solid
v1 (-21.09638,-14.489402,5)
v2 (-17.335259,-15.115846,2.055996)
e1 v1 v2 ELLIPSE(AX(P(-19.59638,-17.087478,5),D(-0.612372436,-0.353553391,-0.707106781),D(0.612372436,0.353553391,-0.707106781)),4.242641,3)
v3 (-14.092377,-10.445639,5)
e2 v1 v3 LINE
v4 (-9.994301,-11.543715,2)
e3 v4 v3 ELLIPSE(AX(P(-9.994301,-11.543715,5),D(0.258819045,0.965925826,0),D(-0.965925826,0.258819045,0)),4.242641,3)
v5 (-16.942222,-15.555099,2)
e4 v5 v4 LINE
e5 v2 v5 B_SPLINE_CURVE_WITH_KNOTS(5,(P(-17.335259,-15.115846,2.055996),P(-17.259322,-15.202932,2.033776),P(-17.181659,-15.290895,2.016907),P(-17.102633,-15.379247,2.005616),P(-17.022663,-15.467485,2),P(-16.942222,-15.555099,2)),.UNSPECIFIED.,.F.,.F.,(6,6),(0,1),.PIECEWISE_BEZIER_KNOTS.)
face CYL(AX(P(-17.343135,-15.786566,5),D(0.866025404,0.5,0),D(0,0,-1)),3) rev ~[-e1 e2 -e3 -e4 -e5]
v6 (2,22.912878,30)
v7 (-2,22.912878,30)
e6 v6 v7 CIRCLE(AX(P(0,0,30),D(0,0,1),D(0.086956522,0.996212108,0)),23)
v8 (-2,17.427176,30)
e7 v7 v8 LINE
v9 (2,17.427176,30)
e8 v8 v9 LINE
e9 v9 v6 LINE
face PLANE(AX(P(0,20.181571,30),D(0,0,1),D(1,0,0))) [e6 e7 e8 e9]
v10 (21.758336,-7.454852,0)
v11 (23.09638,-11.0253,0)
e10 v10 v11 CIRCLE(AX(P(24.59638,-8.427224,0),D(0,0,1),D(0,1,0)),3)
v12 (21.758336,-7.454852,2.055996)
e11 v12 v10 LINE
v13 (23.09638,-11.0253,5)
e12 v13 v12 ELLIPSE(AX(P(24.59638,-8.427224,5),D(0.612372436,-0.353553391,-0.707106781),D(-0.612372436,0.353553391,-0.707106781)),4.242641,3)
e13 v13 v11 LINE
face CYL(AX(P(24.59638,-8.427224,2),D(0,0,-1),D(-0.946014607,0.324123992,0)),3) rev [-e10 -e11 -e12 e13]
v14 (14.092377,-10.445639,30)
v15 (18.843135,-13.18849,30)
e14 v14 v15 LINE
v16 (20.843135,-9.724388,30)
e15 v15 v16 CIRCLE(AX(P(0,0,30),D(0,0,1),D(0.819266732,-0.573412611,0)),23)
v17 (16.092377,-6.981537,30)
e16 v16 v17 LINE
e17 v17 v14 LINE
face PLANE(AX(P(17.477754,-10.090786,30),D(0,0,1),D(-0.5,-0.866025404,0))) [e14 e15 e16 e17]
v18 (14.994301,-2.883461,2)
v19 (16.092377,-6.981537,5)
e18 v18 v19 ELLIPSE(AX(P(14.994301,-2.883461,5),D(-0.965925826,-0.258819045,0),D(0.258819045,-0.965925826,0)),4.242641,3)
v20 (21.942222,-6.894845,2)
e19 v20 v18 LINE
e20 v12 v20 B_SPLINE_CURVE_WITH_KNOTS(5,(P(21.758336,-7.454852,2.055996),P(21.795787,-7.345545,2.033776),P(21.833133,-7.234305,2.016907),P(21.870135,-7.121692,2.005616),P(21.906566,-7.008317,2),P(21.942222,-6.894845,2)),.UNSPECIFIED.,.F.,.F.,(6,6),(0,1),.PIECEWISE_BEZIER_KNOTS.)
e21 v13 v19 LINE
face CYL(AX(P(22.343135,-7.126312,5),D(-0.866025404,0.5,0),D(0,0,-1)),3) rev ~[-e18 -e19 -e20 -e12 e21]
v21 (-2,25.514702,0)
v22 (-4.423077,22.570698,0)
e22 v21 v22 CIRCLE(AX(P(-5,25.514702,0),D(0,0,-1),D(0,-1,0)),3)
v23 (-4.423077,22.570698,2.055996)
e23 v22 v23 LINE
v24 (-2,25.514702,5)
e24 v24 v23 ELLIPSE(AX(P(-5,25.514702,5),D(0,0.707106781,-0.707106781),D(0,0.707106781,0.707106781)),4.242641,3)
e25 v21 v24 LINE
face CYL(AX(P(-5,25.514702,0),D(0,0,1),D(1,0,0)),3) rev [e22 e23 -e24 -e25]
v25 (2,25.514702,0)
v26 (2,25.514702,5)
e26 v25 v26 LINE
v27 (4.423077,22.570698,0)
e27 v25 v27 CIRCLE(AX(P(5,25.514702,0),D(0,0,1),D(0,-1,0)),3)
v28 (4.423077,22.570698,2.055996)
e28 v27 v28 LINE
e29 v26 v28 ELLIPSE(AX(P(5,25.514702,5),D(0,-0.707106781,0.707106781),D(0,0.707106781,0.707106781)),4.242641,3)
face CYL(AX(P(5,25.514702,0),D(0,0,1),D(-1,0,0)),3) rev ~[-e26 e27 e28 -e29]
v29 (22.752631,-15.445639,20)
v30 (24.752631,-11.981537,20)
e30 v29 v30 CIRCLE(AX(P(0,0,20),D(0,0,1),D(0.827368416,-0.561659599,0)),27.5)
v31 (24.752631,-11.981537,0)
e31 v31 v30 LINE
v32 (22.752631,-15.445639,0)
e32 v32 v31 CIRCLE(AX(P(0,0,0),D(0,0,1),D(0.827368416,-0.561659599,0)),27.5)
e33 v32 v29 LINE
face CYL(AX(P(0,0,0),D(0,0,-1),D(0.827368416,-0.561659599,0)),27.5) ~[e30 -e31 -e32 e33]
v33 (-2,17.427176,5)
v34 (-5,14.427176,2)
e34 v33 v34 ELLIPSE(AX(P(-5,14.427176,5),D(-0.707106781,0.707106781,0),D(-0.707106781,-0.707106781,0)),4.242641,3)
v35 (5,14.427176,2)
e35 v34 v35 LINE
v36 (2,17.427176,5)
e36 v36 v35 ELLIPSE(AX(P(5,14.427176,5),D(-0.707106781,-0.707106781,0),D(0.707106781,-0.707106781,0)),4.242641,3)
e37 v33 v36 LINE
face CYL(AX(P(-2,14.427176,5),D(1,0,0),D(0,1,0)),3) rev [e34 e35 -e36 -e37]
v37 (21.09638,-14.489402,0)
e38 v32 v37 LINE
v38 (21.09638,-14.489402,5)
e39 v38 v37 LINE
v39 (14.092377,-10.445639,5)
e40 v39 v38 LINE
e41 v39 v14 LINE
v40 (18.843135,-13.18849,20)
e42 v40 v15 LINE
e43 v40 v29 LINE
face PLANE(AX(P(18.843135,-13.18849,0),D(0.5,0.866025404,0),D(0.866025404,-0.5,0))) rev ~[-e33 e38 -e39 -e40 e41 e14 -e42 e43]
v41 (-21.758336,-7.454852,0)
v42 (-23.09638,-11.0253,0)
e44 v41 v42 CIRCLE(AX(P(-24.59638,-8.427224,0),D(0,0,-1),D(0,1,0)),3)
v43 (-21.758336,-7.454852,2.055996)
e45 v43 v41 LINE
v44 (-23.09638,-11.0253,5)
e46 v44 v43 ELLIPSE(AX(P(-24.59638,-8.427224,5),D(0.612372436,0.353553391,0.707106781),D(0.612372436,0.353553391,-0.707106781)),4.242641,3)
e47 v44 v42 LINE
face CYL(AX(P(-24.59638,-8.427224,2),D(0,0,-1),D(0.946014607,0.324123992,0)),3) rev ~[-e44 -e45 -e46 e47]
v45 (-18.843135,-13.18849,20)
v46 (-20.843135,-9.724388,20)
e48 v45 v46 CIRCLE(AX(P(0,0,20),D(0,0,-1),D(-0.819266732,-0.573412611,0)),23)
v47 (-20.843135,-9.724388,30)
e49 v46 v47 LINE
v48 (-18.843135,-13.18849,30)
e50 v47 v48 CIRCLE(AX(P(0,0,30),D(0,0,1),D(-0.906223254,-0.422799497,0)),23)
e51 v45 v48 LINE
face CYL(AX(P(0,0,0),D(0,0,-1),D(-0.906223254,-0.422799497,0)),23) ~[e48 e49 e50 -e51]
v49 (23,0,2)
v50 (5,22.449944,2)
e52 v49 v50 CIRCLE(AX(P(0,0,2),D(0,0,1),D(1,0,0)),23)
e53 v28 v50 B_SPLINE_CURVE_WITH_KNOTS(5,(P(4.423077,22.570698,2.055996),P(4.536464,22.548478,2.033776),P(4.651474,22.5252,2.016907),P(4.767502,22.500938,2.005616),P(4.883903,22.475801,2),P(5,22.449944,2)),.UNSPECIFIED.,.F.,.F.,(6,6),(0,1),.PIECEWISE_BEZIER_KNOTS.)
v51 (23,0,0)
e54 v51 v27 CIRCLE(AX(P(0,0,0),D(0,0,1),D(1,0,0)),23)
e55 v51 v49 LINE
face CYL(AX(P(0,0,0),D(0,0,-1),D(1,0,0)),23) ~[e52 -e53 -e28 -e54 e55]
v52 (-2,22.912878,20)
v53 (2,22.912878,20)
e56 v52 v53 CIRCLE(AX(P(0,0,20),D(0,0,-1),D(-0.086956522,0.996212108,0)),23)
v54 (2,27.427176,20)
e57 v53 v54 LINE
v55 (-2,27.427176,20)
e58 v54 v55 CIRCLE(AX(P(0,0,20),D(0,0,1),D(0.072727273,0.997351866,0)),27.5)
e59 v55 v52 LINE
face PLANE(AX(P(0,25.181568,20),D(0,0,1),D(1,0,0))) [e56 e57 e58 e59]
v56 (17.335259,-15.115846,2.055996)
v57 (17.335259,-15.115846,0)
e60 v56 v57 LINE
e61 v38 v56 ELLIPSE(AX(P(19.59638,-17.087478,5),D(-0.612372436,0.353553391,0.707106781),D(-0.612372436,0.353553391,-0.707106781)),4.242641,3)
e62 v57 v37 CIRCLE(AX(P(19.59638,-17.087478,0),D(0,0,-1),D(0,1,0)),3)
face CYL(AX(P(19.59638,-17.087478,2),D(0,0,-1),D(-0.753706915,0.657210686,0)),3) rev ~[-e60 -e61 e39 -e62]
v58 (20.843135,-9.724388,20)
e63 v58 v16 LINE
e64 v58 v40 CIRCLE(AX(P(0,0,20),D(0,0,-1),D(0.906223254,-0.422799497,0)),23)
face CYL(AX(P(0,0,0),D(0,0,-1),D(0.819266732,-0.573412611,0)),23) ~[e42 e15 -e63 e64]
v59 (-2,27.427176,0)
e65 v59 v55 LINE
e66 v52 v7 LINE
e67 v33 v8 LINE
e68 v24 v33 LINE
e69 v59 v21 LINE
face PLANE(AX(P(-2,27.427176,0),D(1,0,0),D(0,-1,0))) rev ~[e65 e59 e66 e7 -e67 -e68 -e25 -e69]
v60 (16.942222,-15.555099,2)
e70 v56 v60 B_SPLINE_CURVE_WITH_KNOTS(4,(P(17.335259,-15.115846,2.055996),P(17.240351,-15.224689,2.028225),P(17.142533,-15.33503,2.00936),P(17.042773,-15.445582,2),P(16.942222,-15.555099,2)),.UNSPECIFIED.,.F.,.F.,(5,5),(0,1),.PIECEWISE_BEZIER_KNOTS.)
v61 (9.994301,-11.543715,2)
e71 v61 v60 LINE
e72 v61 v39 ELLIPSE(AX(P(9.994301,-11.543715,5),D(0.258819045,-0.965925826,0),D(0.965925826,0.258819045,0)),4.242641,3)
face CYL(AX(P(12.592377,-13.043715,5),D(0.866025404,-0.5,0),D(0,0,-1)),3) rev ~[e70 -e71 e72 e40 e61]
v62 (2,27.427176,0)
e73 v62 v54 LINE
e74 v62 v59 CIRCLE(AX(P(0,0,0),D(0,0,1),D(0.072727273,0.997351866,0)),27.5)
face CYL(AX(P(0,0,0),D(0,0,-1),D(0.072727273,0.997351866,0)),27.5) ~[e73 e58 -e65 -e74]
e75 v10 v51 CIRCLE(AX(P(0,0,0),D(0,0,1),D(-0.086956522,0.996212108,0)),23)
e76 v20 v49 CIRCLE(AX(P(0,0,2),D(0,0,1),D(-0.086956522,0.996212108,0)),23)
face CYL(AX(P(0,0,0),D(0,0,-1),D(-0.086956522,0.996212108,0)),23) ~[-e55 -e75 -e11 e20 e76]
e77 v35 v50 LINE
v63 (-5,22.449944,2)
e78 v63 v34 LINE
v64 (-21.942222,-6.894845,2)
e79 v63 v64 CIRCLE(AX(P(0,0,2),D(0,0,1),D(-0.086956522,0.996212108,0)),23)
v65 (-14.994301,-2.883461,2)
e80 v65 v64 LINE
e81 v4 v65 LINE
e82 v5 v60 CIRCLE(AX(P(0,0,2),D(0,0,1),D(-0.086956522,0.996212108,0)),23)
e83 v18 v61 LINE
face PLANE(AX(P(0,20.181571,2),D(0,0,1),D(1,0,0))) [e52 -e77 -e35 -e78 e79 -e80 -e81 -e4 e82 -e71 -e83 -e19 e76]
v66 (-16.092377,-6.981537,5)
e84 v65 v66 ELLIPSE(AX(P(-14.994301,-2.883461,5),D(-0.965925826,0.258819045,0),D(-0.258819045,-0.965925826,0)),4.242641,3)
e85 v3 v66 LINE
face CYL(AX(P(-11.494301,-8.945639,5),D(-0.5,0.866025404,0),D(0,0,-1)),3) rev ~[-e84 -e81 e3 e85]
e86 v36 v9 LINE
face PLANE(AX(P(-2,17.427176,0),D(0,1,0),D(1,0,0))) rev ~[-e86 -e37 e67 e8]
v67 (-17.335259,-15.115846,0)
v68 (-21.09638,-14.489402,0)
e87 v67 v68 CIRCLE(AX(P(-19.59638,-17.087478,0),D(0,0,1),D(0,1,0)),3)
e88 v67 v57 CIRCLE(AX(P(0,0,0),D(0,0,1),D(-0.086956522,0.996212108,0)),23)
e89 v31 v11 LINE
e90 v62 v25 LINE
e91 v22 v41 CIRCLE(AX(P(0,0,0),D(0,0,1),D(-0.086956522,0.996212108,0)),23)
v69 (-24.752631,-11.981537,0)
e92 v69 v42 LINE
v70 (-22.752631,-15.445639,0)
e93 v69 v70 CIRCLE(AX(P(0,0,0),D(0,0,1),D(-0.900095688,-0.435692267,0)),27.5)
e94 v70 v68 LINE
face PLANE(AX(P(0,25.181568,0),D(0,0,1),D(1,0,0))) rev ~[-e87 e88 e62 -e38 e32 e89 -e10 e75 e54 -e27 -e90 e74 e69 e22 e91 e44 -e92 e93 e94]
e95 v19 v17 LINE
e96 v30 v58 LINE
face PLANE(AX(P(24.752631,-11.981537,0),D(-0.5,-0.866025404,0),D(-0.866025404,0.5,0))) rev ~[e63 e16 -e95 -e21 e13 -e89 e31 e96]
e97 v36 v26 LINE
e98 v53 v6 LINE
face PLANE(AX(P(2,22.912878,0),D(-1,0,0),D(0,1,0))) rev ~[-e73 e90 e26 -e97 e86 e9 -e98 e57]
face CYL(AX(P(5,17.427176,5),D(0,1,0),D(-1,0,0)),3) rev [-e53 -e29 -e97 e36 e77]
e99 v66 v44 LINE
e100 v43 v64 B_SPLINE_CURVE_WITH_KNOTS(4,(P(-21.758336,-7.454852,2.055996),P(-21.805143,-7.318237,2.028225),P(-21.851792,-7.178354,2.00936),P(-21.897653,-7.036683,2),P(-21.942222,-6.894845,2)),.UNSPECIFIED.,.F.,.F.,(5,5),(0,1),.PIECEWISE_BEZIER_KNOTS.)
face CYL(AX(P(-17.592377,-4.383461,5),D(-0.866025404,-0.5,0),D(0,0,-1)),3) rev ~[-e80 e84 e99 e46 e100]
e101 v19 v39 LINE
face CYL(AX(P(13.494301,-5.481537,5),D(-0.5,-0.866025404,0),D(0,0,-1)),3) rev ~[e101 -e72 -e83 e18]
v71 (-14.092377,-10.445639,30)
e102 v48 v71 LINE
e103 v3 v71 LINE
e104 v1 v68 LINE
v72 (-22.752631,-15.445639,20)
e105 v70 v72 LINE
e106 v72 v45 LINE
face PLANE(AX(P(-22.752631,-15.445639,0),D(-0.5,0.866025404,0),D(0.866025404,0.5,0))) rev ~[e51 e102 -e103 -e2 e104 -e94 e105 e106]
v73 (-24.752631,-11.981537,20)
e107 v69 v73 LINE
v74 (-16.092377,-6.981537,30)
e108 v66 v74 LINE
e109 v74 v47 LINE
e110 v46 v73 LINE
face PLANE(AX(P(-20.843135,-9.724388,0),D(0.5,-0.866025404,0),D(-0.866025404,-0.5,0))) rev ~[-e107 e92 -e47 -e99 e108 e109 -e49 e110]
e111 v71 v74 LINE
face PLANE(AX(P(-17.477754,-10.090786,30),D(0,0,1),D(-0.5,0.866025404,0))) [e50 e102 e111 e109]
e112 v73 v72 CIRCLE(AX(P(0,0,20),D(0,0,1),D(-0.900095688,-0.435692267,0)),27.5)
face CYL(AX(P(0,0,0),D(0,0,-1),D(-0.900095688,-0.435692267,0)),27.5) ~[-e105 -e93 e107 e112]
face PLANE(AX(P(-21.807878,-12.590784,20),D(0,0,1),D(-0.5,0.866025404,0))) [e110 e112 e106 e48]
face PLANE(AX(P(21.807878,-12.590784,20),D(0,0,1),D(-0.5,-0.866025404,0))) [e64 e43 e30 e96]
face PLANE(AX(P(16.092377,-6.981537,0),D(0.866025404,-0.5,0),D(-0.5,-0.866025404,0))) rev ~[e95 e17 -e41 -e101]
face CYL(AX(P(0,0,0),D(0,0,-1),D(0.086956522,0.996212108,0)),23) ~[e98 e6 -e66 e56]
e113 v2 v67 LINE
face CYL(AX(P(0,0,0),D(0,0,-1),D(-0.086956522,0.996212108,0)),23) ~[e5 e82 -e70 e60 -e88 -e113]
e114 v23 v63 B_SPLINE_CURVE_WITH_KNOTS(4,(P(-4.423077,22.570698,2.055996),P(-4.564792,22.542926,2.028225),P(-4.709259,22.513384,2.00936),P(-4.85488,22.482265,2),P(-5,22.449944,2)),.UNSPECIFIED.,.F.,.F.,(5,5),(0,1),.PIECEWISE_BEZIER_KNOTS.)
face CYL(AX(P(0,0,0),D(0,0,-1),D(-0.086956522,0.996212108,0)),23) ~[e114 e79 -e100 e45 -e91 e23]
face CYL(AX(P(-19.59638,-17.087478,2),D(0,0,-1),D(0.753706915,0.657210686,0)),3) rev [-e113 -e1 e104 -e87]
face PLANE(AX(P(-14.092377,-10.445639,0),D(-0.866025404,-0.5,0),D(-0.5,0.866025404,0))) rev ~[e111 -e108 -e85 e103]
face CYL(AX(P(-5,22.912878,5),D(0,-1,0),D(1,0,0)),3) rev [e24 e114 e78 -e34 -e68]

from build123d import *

# Parameters (mm, degrees)
F5_DEPTH = 30
F6_DEPTH = 20
F0_COUNT = 3
F1_DEPTH = 2
F2_R     = 3


# Not quite as in the source:
# - a feature names something its author has since deleted; it is built from what else it names


with BuildPart() as f5:
    # F4 (on Top) → F5 (new body)
    with BuildSketch(Plane.XY):
        with BuildLine():
            ThreePointArc((2, 22.9128784748), (0, 23), (-2, 22.9128784748))
            Line((-2, 22.9128784748), (-2, 17.4271763038))
            Line((-2, 17.4271763038), (2, 17.4271763038))
            Line((2, 17.4271763038), (2, 22.9128784748))
        make_face()
    extrude(amount=F5_DEPTH)

    # F4 (on Top) → F6 (join)
    with BuildSketch(Plane.XY):
        with BuildLine():
            Line((2, 24.4271763038), (2, 27.4271763038))
            Line((2, 27.4271763038), (-2, 27.4271763038))
            Line((-2, 27.4271763038), (-2, 22.9128784748))
            ThreePointArc((-2, 22.9128784748), (0, 23), (2, 22.9128784748))
            Line((2, 22.9128784748), (2, 24.4271763038))
        make_face()
        with BuildLine():
            Line((-2, 27.4271763038), (2, 27.4271763038))
            ThreePointArc((2, 27.4271763038), (0, 27.5), (-2, 27.4271763038))
        make_face()
    extrude(amount=F6_DEPTH)


with BuildPart() as f0_1:
    # F0: instance of F5
    add(f5.part.rotate(Axis((0, 0, 0), (0, 0, 1)), 1 * 360 / F0_COUNT))


with BuildPart() as f0_2:
    # F0: instance of F5
    add(f5.part.rotate(Axis((0, 0, 0), (0, 0, 1)), 2 * 360 / F0_COUNT))


with BuildPart() as f5_1:
    add(f5.part)

    add(f0_1.part)  # F1 merges F0_1

    add(f0_2.part)  # F1 merges F0_2
    # F4 (on Top) → F1 (join)
    with BuildSketch(Plane.XY):
        with BuildLine():
            ThreePointArc((2, 22.9128784748), (0, 23), (-2, 22.9128784748))
            Line((-2, 22.9128784748), (-2, 17.4271763038))
            Line((-2, 17.4271763038), (2, 17.4271763038))
            Line((2, 17.4271763038), (2, 22.9128784748))
        make_face()
        with BuildLine():
            Line((-2, 17.4271763038), (-2, 22.9128784748))
            ThreePointArc((-2, 22.9128784748), (-15.5402702679, -16.9558249578), (23, 0))
            ThreePointArc((23, 0), (16.9558249578, 15.5402702679), (2, 22.9128784748))
            Line((2, 22.9128784748), (2, 17.4271763038))
            Line((2, 17.4271763038), (-2, 17.4271763038))
        make_face()
    extrude(amount=F1_DEPTH)

    # F2
    f2_edges = [f5_1.edges().sort_by_distance(p)[0] for p in [
        (-2, 20.170027, 2),
        (0, 17.427176, 2),
        (2, 20.170027, 2),
        (16.467756, -11.817065, 2),
        (15.092377, -8.713588, 2),
        (18.467756, -8.352963, 2),
        (-18.467756, -8.352963, 2),
        (-15.092377, -8.713588, 2),
        (-16.467756, -11.817065, 2),
        (-2, 22.912878, 1),
        (-20.843135, -9.724388, 1),
        (2, 22.912878, 1),
        (20.843135, -9.724388, 1),
        (18.843135, -13.18849, 1),
        (-18.843135, -13.18849, 1),
    ]]
    fillet(f2_edges, radius=F2_R)


solid = f5_1.part
